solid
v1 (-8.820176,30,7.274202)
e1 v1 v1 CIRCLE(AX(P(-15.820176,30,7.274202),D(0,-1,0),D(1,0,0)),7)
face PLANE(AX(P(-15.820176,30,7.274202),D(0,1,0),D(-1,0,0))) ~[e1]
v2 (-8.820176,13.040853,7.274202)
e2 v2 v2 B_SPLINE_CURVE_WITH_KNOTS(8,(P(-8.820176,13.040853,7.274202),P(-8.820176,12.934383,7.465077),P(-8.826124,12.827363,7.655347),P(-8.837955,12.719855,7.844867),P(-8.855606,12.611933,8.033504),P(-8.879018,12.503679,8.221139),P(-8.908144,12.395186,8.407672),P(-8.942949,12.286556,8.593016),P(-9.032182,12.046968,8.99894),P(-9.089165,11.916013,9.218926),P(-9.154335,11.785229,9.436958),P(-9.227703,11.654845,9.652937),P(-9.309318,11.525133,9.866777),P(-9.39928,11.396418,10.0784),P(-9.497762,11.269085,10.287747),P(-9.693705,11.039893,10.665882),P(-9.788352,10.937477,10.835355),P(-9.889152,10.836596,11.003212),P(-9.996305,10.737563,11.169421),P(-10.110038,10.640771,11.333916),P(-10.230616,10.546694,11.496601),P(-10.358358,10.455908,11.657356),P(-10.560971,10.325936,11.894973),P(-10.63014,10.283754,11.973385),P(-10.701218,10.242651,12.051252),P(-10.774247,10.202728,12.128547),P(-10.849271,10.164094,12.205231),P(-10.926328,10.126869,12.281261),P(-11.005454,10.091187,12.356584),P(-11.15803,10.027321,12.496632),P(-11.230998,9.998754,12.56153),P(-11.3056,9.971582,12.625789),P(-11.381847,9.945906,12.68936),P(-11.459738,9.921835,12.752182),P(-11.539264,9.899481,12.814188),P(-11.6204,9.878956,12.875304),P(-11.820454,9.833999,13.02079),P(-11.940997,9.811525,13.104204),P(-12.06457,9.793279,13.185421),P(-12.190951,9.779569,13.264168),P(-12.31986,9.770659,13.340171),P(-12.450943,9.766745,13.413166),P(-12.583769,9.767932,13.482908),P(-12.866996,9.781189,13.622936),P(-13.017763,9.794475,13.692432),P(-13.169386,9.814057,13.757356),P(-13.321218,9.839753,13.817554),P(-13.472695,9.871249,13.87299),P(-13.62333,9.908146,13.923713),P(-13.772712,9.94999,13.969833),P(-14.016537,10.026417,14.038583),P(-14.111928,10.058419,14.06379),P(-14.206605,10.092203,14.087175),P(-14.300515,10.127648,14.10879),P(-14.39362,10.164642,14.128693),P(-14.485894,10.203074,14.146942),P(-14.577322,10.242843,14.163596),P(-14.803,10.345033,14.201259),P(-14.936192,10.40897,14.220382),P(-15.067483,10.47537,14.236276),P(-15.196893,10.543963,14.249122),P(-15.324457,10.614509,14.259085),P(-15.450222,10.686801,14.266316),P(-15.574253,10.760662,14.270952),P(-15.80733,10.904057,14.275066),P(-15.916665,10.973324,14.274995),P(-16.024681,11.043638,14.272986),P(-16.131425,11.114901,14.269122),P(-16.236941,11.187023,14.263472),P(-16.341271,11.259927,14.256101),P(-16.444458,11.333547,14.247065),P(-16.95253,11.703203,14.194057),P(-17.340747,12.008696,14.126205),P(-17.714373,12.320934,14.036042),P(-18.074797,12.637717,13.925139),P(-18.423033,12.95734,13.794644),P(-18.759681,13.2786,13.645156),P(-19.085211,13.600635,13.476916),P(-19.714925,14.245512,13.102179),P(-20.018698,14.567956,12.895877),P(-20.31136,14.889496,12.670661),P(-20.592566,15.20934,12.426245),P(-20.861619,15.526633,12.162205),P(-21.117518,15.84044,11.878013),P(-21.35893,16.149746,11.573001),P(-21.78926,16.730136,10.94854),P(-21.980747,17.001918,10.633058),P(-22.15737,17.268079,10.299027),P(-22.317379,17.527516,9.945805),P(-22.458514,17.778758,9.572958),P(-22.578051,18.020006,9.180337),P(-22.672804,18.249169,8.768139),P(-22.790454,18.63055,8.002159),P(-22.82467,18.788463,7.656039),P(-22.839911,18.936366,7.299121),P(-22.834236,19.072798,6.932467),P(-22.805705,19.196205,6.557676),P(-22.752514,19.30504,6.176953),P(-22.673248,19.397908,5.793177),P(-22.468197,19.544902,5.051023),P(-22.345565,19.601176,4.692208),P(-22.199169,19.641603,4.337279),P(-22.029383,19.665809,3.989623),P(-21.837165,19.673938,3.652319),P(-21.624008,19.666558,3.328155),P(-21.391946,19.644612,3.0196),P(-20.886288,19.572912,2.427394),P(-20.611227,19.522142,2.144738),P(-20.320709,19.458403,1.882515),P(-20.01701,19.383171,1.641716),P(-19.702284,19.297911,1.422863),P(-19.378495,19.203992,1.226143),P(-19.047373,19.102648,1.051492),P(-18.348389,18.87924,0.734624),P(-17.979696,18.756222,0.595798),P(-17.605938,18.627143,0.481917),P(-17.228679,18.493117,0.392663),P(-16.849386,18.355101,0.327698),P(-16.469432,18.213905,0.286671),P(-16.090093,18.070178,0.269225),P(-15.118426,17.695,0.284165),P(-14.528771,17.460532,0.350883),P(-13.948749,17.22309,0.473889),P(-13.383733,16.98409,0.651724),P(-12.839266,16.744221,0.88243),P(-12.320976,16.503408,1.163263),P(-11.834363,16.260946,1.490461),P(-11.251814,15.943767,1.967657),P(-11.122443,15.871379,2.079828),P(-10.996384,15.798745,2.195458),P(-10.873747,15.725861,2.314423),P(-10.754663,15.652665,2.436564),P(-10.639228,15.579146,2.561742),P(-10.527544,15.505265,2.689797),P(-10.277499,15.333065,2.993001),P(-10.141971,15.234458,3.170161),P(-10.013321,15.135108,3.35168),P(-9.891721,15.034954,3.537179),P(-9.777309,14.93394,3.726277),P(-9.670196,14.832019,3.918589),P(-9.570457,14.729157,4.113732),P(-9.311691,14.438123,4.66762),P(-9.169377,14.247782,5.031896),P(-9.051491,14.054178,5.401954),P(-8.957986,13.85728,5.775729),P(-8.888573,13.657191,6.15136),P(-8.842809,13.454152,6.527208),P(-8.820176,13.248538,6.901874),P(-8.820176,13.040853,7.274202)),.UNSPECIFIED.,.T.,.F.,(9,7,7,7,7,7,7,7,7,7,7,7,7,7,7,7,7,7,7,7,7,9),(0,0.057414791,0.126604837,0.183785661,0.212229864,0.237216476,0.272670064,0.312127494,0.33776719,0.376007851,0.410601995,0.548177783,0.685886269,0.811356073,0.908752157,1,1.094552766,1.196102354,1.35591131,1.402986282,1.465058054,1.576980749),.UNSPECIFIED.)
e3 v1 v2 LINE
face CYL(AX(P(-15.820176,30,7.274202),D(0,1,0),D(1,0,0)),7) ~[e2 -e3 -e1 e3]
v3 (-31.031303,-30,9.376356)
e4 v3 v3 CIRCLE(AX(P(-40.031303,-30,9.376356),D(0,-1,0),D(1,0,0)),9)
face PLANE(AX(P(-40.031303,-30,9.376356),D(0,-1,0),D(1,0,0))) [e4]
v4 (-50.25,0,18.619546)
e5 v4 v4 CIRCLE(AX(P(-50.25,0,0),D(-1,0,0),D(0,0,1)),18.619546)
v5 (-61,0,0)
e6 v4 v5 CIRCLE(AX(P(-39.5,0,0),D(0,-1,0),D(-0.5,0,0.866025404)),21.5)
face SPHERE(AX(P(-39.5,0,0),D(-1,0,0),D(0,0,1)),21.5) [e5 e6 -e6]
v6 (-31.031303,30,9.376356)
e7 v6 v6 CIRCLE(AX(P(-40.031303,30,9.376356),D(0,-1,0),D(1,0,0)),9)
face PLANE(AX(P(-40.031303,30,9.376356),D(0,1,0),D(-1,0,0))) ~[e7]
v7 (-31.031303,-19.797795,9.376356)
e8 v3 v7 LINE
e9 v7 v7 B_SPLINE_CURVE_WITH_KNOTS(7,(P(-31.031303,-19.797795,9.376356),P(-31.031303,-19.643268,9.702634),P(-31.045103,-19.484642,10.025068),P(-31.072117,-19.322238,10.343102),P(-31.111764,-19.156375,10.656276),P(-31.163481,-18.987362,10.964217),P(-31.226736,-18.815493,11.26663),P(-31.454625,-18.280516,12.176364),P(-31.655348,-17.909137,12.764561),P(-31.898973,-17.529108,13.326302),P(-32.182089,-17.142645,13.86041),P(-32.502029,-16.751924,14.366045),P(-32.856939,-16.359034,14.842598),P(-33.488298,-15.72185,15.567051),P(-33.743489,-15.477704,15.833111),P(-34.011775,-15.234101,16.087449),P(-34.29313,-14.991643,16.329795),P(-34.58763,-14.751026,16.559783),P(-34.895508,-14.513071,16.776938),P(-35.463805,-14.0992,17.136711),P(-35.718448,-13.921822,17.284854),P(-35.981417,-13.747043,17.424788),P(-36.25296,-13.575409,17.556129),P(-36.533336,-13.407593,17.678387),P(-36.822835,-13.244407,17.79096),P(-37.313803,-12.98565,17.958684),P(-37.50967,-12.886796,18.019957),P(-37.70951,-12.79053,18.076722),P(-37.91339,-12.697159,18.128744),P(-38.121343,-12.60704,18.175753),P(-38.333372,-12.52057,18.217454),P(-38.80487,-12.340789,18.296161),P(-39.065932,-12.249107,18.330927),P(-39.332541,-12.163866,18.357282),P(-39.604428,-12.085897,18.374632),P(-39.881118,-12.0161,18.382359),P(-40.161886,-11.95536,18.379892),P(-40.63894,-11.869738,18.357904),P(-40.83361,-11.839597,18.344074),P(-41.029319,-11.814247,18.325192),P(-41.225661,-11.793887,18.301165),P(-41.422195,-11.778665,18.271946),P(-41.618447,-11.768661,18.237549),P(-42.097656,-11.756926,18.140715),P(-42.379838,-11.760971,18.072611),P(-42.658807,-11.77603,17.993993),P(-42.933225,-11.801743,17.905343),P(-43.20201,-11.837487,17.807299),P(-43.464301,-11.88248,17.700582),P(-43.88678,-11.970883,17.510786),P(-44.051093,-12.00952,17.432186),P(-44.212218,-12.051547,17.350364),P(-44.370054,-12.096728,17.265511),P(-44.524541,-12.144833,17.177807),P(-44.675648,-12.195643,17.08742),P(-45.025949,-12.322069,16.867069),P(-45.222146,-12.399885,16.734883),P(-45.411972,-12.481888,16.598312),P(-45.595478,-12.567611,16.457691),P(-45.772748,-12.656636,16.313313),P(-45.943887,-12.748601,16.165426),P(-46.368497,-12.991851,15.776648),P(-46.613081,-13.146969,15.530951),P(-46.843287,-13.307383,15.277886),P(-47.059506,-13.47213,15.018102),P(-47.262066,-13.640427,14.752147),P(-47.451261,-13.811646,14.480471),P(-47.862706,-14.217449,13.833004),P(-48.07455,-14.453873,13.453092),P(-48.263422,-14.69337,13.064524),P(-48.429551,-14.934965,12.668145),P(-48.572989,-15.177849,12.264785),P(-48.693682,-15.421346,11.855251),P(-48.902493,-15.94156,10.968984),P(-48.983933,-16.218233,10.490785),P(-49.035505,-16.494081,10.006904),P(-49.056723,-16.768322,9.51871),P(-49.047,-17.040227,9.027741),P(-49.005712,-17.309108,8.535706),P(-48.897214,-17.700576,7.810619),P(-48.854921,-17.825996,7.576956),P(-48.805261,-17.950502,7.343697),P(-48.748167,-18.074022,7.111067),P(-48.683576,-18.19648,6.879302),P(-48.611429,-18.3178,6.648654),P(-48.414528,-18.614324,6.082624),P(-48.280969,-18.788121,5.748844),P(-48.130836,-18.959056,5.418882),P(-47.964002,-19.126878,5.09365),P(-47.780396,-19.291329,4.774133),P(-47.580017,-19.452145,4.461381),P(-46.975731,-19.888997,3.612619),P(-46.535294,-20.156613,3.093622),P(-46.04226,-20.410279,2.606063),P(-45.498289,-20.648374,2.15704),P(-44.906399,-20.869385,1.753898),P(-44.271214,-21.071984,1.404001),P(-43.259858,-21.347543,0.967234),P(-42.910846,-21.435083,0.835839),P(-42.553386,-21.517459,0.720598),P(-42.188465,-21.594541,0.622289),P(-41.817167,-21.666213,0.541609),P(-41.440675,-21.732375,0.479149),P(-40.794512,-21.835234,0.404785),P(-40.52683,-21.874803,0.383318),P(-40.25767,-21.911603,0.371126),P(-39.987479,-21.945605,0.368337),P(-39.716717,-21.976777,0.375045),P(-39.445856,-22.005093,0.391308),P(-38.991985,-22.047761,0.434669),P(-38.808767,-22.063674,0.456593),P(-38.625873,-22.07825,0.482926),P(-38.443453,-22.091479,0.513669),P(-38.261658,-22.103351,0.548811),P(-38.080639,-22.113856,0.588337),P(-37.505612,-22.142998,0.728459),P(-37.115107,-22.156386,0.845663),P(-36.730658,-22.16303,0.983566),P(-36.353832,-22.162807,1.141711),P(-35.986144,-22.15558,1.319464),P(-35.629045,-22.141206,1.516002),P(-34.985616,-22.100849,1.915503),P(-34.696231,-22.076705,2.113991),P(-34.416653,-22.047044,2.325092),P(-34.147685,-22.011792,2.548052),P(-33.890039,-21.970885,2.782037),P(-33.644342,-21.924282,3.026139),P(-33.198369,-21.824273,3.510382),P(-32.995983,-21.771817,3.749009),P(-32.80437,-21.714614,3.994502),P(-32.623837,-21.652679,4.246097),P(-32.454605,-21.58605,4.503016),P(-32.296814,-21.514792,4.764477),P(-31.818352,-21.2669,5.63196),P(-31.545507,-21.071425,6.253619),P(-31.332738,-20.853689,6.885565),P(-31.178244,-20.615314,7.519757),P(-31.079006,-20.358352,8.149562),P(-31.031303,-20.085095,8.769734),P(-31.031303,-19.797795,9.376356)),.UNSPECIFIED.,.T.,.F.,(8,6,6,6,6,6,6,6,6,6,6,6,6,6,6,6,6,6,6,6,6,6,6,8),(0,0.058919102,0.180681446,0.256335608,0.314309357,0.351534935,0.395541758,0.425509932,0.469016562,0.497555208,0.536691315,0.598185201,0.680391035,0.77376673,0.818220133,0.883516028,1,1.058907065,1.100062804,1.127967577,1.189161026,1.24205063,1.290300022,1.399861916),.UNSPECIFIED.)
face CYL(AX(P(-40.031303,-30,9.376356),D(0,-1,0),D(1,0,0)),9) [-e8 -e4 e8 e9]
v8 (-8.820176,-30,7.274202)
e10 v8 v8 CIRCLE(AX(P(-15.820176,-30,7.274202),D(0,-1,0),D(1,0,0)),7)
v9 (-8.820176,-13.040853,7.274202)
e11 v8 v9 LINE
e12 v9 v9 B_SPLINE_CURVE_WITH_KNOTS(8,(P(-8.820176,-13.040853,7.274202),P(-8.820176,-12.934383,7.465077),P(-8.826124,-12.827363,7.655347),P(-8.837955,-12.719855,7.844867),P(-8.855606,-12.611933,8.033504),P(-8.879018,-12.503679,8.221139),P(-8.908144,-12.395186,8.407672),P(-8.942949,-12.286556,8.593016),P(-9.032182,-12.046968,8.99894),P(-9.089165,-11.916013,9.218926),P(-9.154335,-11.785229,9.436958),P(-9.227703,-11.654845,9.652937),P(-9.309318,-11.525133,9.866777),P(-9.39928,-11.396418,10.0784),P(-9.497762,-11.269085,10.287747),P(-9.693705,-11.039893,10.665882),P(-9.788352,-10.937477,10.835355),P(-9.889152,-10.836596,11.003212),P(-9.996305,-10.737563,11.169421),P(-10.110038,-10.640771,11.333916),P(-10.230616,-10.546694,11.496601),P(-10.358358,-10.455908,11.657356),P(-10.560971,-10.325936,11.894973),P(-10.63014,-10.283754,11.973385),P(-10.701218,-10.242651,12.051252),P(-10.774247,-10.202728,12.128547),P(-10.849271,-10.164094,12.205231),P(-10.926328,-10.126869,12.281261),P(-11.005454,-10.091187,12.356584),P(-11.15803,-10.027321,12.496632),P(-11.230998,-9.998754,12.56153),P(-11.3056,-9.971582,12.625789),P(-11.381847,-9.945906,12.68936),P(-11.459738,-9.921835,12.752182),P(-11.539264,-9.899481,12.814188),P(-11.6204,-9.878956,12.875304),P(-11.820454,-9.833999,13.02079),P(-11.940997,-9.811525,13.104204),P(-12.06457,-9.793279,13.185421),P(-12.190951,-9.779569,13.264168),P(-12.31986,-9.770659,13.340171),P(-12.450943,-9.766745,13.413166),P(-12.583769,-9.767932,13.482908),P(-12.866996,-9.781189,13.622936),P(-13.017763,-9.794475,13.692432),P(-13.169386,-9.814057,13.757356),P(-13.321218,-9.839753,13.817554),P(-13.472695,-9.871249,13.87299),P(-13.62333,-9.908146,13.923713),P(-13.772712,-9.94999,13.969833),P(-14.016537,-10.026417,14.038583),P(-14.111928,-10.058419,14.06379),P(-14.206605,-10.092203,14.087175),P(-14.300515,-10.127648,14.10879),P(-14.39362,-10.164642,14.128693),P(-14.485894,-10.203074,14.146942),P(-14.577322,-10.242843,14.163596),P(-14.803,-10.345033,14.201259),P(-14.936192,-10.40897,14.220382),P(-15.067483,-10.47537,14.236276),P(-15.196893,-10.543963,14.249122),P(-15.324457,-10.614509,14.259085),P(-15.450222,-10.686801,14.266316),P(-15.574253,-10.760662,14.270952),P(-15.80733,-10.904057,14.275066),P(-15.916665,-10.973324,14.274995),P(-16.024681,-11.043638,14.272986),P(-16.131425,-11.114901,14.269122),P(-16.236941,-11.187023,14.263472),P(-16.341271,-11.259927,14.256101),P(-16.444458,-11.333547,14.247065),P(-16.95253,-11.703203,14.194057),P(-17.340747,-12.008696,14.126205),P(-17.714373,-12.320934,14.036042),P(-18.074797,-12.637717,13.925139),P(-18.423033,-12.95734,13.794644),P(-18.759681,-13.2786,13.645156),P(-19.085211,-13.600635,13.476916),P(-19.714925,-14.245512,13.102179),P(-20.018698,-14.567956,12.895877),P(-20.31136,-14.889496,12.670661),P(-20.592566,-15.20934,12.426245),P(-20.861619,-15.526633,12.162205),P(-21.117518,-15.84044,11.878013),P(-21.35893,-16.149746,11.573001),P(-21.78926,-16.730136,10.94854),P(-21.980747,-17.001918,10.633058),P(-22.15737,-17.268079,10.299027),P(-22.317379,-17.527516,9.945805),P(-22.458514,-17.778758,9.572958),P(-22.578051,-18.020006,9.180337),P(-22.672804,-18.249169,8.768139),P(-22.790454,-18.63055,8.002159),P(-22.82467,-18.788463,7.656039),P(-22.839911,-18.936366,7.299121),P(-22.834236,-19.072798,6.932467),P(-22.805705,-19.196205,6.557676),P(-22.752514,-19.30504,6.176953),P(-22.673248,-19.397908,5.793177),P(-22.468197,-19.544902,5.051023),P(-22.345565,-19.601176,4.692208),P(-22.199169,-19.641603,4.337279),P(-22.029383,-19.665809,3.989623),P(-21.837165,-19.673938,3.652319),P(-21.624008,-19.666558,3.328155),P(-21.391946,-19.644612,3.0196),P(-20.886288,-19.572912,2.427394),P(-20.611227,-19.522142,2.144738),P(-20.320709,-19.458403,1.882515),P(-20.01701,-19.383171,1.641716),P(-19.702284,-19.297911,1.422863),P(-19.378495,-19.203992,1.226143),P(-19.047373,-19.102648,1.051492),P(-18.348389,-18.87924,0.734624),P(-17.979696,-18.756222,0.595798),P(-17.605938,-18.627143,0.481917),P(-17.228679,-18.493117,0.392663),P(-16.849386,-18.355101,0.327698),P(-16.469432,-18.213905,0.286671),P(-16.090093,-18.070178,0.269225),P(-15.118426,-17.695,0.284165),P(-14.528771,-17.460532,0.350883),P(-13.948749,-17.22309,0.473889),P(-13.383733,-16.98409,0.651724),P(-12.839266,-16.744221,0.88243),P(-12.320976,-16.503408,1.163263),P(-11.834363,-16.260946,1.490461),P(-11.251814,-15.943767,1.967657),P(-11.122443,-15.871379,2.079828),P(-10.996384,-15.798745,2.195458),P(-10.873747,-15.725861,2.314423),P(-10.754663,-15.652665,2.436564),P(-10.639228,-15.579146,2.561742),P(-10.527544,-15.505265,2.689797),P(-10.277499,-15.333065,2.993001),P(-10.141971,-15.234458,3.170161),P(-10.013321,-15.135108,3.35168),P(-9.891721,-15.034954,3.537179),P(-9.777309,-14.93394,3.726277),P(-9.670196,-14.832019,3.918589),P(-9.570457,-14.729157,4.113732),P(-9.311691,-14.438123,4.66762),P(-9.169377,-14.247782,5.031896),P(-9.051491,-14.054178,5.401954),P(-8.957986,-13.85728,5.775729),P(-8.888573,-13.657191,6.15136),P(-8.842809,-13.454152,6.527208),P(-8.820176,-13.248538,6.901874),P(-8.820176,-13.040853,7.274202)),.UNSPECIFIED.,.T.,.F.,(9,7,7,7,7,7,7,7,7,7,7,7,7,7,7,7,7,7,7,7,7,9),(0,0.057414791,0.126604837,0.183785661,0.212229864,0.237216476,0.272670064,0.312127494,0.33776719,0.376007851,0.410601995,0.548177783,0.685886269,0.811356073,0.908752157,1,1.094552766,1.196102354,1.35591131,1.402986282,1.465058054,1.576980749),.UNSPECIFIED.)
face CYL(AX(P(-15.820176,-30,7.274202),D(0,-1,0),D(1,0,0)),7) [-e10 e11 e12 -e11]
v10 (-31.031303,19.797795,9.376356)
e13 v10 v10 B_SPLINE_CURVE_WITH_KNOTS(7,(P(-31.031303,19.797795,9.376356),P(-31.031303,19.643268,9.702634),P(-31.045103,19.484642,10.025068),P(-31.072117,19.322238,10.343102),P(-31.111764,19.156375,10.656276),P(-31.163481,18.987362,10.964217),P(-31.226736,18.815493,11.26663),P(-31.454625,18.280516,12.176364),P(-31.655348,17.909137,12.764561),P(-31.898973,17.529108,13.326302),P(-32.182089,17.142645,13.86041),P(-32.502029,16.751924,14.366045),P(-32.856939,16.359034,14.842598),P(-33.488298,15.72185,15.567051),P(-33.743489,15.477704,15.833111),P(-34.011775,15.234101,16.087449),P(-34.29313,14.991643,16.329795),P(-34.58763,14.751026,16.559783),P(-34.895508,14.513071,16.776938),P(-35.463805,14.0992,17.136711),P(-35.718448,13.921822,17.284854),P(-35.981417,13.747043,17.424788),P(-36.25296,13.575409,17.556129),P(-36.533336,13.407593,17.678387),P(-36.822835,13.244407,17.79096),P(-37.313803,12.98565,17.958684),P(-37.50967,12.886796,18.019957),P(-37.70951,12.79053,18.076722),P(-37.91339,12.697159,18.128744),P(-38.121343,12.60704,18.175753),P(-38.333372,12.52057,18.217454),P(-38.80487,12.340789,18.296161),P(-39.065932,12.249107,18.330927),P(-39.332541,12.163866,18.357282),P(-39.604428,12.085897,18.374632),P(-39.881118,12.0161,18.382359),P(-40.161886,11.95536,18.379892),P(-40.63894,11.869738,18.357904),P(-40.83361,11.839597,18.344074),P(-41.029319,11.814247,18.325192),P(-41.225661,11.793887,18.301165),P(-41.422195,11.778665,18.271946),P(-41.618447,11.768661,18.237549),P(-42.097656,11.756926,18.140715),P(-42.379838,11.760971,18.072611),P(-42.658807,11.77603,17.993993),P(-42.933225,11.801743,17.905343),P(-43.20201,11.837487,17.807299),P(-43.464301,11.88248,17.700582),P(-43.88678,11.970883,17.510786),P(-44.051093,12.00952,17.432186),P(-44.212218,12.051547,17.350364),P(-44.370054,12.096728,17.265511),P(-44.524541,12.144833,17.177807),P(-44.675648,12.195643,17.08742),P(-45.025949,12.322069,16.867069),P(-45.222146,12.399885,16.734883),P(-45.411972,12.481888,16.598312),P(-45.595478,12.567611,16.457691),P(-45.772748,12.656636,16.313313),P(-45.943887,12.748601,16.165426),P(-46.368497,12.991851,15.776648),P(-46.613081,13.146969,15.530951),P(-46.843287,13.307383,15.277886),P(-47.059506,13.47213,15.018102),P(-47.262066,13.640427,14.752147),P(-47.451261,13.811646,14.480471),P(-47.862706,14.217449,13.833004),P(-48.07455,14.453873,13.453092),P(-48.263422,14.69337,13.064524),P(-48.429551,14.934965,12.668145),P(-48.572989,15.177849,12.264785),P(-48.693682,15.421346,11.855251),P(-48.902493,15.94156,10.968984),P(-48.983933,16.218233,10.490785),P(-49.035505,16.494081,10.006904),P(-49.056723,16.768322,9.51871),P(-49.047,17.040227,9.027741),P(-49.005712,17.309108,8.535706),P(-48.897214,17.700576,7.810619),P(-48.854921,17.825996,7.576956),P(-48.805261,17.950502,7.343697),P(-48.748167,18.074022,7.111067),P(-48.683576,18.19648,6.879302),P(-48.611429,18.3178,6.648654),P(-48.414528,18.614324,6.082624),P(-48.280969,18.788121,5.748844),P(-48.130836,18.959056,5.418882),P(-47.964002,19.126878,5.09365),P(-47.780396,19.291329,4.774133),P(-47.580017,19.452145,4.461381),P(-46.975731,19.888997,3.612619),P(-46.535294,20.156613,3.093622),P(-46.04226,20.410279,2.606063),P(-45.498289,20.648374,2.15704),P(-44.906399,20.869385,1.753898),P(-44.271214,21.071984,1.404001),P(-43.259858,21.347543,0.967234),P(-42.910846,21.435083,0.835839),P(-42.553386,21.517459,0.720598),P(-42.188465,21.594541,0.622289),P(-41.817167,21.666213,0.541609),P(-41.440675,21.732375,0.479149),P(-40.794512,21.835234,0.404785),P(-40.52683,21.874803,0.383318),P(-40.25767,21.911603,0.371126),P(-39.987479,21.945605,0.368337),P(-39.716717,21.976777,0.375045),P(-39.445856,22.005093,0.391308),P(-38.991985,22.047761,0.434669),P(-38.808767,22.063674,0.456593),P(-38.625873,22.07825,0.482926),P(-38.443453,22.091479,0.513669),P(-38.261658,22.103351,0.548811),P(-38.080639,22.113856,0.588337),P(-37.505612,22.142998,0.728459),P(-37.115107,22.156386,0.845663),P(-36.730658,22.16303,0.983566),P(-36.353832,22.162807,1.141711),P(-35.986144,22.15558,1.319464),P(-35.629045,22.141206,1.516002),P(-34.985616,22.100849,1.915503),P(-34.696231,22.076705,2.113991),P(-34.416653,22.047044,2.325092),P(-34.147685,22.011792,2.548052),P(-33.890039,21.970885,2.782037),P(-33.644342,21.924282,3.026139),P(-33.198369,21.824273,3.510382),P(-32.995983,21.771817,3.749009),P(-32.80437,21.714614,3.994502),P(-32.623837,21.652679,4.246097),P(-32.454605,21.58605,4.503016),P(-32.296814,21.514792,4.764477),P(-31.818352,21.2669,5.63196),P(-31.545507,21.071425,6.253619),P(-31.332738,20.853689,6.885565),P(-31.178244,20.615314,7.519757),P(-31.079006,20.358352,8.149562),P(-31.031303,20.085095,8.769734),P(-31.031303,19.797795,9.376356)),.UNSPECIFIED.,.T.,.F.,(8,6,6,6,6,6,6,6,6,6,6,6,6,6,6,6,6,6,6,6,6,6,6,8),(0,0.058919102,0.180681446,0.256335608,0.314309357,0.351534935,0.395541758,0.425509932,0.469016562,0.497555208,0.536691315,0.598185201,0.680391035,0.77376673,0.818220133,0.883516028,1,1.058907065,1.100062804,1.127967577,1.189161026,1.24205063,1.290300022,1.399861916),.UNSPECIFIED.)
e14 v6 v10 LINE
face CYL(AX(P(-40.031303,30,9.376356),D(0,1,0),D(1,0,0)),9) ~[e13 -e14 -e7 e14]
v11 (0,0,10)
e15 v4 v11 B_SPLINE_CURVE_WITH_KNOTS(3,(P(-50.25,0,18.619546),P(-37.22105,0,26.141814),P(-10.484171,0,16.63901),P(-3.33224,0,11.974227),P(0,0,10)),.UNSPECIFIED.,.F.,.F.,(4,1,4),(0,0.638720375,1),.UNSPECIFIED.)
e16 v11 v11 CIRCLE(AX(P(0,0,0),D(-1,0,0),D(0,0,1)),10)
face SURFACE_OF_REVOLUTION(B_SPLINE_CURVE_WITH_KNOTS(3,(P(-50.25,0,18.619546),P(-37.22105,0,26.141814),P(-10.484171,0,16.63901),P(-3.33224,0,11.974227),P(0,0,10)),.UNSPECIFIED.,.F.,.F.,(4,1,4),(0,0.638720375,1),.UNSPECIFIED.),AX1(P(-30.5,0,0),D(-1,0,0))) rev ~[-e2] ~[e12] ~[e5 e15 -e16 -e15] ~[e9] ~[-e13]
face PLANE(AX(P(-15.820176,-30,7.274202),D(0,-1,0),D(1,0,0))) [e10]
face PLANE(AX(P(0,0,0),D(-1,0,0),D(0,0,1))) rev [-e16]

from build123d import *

# Parameters (mm, degrees)
F3_R   = 7
F3_R_2 = 9


# Not quite as in the source:
# - a pattern or mirror of a feature is missing from the dataset's text; its kind, count and spacing are read off the source's solid


with BuildPart() as f1:
    # F0 (on Front) → F1 (revolve)
    with BuildSketch(Plane.XZ):
        with BuildLine():
            Line((-61, 0), (0, 0))
            Line((0, 0), (0, 10))
            add(Edge.make_bspline(
                [(-50.25, 18.6195461814), (-37.2210499958, 26.1418139735), (-10.4841707805, 16.6390100311), (-3.3322397366, 11.9742266545), (0, 10)],
                knots=[0, 0, 0, 0, 0.6387203747, 1, 1, 1, 1], degree=3))
            ThreePointArc((-50.25, 18.6195461814), (-58.1195461814, 10.75), (-61, 0))
        make_face()
    revolve(axis=Axis((-30.5, 0, 0), (-1, 0, 0)))

    # F3 (on offset) → F4 (join, up to the next surface of F1)
    with BuildSketch(Plane.XZ.offset(30)):
        with Locations((-15.8201763071, 7.2742023454)):
            Circle(F3_R)
        with Locations((-40.0313028448, 9.3763558499)):
            Circle(F3_R_2)
    f4 = extrude(until=Until.NEXT, dir=(0, 1, 0))

    # F4_copies: F4 across plane
    add(f4.mirror(Plane.ZX))


solid = f1.part
